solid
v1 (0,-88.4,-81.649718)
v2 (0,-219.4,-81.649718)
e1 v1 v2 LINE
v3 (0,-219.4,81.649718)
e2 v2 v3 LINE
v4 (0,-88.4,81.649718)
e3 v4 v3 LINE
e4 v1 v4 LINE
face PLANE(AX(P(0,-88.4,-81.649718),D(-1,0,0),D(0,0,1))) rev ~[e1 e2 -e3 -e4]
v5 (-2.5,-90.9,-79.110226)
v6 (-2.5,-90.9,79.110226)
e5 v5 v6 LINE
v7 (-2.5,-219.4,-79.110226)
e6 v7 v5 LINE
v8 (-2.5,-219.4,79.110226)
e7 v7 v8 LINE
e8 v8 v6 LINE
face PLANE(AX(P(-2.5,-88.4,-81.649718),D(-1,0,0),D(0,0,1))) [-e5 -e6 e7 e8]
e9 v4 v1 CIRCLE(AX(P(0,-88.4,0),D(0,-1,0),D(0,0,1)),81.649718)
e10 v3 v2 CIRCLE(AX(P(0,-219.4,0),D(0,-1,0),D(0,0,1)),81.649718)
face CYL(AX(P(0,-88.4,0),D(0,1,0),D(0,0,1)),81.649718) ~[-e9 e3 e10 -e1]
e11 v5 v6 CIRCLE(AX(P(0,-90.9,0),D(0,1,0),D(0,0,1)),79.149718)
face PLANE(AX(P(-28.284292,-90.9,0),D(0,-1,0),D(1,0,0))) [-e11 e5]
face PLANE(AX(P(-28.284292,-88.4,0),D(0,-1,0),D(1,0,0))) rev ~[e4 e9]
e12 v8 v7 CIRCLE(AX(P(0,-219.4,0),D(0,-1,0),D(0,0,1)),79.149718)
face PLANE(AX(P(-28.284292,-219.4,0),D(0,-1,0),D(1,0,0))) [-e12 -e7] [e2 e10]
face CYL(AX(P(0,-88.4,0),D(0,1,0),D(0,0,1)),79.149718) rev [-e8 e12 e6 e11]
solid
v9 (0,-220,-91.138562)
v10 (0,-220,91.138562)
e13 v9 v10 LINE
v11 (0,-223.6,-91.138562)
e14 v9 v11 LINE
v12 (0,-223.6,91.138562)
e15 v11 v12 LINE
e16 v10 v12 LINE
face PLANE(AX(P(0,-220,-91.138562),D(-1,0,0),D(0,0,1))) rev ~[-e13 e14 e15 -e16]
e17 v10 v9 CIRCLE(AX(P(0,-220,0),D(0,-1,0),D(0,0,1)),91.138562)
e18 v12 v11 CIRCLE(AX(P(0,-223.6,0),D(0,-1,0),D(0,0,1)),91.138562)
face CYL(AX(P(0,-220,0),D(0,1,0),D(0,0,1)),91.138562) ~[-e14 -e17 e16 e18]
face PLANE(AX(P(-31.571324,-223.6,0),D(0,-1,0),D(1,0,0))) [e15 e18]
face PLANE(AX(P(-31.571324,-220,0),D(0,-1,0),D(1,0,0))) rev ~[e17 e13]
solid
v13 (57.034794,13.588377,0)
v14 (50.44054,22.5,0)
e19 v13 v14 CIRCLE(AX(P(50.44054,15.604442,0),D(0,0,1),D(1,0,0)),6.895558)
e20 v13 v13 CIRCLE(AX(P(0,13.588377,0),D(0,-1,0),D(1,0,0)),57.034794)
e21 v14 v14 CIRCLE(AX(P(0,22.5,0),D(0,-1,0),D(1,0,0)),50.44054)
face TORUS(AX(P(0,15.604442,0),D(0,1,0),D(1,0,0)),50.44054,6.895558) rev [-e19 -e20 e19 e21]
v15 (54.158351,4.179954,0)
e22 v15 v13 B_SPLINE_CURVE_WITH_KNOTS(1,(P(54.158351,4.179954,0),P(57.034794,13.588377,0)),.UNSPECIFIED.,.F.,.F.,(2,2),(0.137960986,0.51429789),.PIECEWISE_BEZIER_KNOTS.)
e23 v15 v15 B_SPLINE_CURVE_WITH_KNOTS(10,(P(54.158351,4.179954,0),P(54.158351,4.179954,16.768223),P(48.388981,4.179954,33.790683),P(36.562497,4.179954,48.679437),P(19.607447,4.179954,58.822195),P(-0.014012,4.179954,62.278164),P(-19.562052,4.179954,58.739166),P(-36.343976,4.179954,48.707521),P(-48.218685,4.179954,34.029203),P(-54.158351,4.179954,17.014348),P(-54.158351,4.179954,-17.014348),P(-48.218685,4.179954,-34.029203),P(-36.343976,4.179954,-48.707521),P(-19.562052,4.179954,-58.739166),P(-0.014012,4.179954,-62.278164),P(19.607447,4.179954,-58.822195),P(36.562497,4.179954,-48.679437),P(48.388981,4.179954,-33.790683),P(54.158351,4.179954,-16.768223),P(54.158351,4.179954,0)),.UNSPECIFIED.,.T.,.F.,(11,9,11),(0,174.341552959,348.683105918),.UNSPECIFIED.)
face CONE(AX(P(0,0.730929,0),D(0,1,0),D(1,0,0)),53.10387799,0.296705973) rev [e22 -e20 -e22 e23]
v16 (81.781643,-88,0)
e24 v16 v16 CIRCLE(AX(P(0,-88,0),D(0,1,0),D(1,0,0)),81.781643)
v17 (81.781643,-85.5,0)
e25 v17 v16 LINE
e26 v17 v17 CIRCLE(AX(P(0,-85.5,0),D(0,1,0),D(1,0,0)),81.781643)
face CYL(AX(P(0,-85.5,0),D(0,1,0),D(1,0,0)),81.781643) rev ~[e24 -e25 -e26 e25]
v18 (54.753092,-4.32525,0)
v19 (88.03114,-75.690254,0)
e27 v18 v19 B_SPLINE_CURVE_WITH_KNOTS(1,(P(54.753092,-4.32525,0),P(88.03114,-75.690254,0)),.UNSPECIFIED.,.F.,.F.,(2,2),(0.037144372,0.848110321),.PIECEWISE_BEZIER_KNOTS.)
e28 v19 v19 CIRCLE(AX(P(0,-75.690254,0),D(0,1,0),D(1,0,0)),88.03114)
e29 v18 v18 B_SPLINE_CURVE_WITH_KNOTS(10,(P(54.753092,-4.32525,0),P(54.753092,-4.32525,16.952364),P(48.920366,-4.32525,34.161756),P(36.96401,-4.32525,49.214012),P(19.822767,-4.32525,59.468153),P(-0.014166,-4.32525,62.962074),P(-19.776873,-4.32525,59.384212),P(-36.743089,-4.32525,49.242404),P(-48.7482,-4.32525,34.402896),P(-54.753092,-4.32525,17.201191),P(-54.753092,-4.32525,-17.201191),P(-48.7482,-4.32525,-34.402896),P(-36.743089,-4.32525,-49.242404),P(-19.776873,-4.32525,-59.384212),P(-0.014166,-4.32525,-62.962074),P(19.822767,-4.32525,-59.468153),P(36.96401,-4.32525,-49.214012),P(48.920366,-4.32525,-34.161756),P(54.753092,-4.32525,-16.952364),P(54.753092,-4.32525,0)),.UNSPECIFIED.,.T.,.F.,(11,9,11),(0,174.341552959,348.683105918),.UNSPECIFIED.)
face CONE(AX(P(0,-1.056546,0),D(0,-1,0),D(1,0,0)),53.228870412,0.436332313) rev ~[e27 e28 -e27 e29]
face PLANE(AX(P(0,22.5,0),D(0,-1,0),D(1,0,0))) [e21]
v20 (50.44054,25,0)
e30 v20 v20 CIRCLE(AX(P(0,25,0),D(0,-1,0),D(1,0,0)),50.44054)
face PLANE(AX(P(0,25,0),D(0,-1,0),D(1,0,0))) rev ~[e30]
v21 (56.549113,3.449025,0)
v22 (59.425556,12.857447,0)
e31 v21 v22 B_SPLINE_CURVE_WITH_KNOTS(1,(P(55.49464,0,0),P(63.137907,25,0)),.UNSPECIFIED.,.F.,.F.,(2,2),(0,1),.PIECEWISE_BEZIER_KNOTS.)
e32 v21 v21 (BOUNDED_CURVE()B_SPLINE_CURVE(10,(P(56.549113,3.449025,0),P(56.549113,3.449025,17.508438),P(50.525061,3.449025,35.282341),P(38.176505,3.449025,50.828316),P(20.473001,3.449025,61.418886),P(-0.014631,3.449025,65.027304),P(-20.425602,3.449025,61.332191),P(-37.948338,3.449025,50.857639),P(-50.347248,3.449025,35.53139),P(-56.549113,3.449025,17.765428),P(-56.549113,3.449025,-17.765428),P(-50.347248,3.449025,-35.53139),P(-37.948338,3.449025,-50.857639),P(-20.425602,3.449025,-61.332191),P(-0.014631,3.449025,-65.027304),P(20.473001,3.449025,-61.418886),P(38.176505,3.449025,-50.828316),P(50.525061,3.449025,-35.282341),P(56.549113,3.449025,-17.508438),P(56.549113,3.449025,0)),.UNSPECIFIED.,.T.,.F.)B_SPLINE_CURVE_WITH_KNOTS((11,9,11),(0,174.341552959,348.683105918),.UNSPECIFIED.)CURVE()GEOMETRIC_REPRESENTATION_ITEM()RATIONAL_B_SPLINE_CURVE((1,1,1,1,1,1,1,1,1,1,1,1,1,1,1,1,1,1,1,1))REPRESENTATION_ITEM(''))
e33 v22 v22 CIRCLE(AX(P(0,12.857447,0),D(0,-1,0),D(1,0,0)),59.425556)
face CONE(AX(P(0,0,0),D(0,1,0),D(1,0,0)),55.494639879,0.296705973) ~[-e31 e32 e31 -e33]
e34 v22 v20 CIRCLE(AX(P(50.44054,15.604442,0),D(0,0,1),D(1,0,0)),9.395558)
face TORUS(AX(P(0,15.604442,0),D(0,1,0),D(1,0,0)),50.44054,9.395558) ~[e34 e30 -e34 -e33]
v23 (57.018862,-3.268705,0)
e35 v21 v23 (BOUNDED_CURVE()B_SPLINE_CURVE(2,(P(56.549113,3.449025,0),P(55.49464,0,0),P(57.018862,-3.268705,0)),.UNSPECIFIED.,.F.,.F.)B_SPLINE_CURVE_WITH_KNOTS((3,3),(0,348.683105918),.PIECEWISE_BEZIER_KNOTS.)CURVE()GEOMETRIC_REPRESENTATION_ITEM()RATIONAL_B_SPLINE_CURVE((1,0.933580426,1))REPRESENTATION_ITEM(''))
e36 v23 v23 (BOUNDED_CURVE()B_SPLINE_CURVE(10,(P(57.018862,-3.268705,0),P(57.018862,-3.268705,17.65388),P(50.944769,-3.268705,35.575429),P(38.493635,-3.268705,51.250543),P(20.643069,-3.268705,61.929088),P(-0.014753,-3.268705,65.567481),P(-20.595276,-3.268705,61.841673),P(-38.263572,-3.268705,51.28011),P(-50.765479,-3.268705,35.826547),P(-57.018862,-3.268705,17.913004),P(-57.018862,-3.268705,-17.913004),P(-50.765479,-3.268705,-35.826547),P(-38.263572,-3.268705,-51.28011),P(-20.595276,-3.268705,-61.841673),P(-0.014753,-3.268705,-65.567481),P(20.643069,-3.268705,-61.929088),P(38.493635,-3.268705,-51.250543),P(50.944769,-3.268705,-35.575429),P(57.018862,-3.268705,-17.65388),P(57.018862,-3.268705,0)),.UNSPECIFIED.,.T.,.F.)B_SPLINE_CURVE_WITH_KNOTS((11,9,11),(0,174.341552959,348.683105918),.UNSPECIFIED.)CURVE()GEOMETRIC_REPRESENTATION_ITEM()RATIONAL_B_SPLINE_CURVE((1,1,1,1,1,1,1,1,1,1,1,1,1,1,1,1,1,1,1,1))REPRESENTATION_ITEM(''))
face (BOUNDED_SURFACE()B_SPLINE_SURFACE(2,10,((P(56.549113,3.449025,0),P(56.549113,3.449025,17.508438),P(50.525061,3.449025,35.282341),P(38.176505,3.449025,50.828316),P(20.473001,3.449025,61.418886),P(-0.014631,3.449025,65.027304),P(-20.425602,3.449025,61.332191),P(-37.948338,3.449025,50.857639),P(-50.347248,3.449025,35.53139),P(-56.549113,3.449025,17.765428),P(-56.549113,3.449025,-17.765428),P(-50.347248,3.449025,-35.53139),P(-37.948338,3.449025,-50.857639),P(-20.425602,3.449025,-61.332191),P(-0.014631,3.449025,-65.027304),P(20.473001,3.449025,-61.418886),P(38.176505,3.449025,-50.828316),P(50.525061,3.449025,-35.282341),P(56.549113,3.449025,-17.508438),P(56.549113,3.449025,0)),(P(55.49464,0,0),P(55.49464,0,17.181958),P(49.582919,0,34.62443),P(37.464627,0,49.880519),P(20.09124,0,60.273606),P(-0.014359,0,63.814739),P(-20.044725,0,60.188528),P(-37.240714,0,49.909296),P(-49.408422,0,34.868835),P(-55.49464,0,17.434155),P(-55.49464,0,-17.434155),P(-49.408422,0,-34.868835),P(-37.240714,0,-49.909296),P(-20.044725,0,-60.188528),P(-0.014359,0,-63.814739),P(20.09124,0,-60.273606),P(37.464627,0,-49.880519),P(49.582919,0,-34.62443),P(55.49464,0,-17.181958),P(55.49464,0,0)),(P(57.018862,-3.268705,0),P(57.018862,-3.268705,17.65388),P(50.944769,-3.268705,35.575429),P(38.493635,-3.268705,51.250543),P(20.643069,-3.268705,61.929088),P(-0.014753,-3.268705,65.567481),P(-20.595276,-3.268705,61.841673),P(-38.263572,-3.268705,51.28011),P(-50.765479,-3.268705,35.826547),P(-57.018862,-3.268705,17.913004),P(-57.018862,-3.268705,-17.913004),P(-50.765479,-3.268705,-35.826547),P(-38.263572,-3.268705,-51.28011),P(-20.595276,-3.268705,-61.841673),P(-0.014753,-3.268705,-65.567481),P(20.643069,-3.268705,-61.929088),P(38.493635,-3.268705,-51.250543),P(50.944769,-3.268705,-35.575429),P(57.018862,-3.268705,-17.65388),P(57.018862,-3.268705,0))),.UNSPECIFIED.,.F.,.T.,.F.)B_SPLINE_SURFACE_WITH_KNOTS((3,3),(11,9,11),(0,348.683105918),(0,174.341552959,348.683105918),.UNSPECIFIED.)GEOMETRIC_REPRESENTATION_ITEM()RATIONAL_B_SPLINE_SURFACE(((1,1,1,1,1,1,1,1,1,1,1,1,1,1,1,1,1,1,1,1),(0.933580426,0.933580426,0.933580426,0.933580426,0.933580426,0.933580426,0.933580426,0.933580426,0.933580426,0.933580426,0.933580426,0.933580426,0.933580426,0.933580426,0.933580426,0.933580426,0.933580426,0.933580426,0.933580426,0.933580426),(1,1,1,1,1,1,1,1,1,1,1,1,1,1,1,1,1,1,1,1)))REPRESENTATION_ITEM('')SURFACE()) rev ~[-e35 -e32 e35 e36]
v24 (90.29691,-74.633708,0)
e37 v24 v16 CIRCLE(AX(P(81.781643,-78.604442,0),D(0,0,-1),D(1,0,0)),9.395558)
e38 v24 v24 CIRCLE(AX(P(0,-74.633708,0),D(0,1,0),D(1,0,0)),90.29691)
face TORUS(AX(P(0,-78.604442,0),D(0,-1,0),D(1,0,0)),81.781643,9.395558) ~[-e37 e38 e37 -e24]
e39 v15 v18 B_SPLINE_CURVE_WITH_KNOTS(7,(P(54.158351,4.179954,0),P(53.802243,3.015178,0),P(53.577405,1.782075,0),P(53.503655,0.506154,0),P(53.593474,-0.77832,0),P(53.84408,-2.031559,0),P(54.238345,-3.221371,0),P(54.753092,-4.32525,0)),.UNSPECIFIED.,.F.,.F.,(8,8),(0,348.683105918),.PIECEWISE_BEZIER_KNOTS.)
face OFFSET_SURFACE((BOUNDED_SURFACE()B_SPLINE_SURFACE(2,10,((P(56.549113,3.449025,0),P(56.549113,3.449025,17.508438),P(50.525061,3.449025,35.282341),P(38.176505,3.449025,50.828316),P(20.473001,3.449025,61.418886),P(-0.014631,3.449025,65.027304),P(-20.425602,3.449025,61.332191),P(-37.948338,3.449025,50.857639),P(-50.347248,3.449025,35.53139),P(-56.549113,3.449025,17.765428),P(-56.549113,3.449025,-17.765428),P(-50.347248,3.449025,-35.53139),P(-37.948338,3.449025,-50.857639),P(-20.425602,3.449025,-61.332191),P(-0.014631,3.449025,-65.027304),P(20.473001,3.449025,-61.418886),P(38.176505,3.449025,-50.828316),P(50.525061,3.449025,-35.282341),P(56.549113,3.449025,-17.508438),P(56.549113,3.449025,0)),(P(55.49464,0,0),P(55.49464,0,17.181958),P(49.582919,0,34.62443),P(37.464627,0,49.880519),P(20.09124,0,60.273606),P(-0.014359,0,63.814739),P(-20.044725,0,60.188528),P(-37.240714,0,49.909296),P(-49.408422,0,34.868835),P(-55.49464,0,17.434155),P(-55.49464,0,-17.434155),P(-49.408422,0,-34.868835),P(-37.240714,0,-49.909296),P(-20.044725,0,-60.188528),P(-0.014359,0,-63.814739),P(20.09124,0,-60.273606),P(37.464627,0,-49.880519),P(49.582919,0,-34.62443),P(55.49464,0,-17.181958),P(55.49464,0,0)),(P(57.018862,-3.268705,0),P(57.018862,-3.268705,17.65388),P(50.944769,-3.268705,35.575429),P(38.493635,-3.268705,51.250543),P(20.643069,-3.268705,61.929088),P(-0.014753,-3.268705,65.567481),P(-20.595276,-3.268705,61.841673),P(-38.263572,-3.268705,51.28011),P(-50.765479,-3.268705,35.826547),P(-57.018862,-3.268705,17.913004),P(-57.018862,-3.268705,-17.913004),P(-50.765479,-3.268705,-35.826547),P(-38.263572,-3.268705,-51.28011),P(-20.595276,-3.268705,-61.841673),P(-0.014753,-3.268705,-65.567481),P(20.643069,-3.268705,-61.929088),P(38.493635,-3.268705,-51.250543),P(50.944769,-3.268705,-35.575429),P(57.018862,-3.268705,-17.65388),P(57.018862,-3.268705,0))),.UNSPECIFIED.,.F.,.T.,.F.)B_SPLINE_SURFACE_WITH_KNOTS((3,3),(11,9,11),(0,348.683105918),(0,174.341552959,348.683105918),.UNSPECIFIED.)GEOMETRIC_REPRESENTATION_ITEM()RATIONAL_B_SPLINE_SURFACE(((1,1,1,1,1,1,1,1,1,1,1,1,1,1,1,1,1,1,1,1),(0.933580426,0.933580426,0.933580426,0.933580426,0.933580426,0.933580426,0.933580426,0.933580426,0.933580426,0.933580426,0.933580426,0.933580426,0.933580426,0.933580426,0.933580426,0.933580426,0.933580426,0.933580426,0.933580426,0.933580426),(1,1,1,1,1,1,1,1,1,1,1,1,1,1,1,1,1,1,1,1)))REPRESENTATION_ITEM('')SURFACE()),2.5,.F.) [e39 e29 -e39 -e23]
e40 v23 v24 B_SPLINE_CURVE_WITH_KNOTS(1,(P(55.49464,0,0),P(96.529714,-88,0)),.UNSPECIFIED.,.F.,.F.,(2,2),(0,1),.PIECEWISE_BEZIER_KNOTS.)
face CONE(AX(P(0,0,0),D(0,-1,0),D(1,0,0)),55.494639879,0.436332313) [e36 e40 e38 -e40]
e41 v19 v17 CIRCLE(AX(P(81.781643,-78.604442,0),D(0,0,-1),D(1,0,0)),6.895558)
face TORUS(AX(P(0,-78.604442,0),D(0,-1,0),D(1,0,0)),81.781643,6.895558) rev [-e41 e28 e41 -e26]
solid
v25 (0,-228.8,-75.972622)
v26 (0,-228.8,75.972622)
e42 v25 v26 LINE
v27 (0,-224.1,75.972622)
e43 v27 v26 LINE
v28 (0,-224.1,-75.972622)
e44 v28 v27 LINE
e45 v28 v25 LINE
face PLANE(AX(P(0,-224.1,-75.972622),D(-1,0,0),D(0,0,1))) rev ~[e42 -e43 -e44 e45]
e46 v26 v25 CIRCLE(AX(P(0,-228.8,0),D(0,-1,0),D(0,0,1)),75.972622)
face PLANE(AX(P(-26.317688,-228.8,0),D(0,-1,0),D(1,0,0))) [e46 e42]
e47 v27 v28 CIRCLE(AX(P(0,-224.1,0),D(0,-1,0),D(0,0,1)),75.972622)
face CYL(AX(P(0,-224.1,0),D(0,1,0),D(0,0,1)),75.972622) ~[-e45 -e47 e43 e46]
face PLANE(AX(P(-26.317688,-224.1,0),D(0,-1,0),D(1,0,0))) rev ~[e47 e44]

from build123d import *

# Parameters (mm, degrees)
F0_R          = 55.4946398795
F1_DEPTH      = 88
F1_TAPER      = -25
F1_DEPTH_BACK = 25
F1_TAPER_BACK = -17
F2_R          = 9.3955575751
F5_DEPTH      = 131
F6_T          = -2.5
F7_T          = -2.5
F10_DEPTH     = 3.6
F13_DEPTH     = 4.7


# Not quite as in the source:
# - a shell that OpenCascade refuses in one call is made with other operations: the cavity is built on its own and cut out


with BuildPart() as f1:
    # F0 (on Front) → F1 (new body, two sides)
    with BuildSketch(Plane.XZ) as f1_sk:
        Circle(F0_R)
    extrude(amount=F1_DEPTH, taper=F1_TAPER)
    extrude(f1_sk.sketch, amount=-F1_DEPTH_BACK, taper=F1_TAPER_BACK)

    # F2
    f2_edges = [f1.edges().sort_by_distance(p)[0] for p in [
        (-96.529714, -88, 0),
        (-63.137907, 25, 0),
        (-55.49464, 0, 0),
    ]]
    fillet(f2_edges, radius=F2_R)

    # F6: a shell. OpenCascade refuses it in one call, so the cavity is built on its own and cut out:
    # the body offset inwards by the wall thickness, plus a prism from it out through each open face.
    f6_core = offset(f1.part, amount=F6_T, mode=Mode.PRIVATE)
    f6_exits = [f6_core.faces().sort_by_distance(p)[0] for p in [
        (0, -85.5, 0),
    ]]
    add(f6_core, mode=Mode.SUBTRACT)
    extrude(f6_exits, amount=-F6_T, mode=Mode.SUBTRACT)


with BuildPart() as f5:
    # F4 (on offset) → F5 (new body)
    with BuildSketch(Plane.XZ.offset(88.4)):
        with BuildLine():
            Line((0, -81.64971785), (0, 81.64971785))
            ThreePointArc((0, 81.64971785), (-81.64971785, 0), (0, -81.64971785))
        make_face()
    extrude(amount=F5_DEPTH)

    # F7
    f7_openings = [f5.faces().sort_by_distance(p)[0] for p in [
        (-34.653217, -219.4, 0),
    ]]
    offset(amount=F7_T, openings=f7_openings)


with BuildPart() as f10:
    # F9 (on offset) → F10 (new body)
    with BuildSketch(Plane.XZ.offset(220)):
        with BuildLine():
            Line((0, -91.1385615924), (0, 91.1385615924))
            ThreePointArc((0, 91.1385615924), (-91.1385615924, 0), (0, -91.1385615924))
        make_face()
    extrude(amount=F10_DEPTH)


with BuildPart() as f13:
    # F12 (on offset) → F13 (new body)
    with BuildSketch(Plane.XZ.offset(224.1)):
        with BuildLine():
            Line((0, -75.9726215886), (0, 75.9726215886))
            ThreePointArc((0, 75.9726215886), (-75.9726215886, 0), (0, -75.9726215886))
        make_face()
    extrude(amount=F13_DEPTH)


solid = Compound([f1.part, f5.part, f10.part, f13.part])
